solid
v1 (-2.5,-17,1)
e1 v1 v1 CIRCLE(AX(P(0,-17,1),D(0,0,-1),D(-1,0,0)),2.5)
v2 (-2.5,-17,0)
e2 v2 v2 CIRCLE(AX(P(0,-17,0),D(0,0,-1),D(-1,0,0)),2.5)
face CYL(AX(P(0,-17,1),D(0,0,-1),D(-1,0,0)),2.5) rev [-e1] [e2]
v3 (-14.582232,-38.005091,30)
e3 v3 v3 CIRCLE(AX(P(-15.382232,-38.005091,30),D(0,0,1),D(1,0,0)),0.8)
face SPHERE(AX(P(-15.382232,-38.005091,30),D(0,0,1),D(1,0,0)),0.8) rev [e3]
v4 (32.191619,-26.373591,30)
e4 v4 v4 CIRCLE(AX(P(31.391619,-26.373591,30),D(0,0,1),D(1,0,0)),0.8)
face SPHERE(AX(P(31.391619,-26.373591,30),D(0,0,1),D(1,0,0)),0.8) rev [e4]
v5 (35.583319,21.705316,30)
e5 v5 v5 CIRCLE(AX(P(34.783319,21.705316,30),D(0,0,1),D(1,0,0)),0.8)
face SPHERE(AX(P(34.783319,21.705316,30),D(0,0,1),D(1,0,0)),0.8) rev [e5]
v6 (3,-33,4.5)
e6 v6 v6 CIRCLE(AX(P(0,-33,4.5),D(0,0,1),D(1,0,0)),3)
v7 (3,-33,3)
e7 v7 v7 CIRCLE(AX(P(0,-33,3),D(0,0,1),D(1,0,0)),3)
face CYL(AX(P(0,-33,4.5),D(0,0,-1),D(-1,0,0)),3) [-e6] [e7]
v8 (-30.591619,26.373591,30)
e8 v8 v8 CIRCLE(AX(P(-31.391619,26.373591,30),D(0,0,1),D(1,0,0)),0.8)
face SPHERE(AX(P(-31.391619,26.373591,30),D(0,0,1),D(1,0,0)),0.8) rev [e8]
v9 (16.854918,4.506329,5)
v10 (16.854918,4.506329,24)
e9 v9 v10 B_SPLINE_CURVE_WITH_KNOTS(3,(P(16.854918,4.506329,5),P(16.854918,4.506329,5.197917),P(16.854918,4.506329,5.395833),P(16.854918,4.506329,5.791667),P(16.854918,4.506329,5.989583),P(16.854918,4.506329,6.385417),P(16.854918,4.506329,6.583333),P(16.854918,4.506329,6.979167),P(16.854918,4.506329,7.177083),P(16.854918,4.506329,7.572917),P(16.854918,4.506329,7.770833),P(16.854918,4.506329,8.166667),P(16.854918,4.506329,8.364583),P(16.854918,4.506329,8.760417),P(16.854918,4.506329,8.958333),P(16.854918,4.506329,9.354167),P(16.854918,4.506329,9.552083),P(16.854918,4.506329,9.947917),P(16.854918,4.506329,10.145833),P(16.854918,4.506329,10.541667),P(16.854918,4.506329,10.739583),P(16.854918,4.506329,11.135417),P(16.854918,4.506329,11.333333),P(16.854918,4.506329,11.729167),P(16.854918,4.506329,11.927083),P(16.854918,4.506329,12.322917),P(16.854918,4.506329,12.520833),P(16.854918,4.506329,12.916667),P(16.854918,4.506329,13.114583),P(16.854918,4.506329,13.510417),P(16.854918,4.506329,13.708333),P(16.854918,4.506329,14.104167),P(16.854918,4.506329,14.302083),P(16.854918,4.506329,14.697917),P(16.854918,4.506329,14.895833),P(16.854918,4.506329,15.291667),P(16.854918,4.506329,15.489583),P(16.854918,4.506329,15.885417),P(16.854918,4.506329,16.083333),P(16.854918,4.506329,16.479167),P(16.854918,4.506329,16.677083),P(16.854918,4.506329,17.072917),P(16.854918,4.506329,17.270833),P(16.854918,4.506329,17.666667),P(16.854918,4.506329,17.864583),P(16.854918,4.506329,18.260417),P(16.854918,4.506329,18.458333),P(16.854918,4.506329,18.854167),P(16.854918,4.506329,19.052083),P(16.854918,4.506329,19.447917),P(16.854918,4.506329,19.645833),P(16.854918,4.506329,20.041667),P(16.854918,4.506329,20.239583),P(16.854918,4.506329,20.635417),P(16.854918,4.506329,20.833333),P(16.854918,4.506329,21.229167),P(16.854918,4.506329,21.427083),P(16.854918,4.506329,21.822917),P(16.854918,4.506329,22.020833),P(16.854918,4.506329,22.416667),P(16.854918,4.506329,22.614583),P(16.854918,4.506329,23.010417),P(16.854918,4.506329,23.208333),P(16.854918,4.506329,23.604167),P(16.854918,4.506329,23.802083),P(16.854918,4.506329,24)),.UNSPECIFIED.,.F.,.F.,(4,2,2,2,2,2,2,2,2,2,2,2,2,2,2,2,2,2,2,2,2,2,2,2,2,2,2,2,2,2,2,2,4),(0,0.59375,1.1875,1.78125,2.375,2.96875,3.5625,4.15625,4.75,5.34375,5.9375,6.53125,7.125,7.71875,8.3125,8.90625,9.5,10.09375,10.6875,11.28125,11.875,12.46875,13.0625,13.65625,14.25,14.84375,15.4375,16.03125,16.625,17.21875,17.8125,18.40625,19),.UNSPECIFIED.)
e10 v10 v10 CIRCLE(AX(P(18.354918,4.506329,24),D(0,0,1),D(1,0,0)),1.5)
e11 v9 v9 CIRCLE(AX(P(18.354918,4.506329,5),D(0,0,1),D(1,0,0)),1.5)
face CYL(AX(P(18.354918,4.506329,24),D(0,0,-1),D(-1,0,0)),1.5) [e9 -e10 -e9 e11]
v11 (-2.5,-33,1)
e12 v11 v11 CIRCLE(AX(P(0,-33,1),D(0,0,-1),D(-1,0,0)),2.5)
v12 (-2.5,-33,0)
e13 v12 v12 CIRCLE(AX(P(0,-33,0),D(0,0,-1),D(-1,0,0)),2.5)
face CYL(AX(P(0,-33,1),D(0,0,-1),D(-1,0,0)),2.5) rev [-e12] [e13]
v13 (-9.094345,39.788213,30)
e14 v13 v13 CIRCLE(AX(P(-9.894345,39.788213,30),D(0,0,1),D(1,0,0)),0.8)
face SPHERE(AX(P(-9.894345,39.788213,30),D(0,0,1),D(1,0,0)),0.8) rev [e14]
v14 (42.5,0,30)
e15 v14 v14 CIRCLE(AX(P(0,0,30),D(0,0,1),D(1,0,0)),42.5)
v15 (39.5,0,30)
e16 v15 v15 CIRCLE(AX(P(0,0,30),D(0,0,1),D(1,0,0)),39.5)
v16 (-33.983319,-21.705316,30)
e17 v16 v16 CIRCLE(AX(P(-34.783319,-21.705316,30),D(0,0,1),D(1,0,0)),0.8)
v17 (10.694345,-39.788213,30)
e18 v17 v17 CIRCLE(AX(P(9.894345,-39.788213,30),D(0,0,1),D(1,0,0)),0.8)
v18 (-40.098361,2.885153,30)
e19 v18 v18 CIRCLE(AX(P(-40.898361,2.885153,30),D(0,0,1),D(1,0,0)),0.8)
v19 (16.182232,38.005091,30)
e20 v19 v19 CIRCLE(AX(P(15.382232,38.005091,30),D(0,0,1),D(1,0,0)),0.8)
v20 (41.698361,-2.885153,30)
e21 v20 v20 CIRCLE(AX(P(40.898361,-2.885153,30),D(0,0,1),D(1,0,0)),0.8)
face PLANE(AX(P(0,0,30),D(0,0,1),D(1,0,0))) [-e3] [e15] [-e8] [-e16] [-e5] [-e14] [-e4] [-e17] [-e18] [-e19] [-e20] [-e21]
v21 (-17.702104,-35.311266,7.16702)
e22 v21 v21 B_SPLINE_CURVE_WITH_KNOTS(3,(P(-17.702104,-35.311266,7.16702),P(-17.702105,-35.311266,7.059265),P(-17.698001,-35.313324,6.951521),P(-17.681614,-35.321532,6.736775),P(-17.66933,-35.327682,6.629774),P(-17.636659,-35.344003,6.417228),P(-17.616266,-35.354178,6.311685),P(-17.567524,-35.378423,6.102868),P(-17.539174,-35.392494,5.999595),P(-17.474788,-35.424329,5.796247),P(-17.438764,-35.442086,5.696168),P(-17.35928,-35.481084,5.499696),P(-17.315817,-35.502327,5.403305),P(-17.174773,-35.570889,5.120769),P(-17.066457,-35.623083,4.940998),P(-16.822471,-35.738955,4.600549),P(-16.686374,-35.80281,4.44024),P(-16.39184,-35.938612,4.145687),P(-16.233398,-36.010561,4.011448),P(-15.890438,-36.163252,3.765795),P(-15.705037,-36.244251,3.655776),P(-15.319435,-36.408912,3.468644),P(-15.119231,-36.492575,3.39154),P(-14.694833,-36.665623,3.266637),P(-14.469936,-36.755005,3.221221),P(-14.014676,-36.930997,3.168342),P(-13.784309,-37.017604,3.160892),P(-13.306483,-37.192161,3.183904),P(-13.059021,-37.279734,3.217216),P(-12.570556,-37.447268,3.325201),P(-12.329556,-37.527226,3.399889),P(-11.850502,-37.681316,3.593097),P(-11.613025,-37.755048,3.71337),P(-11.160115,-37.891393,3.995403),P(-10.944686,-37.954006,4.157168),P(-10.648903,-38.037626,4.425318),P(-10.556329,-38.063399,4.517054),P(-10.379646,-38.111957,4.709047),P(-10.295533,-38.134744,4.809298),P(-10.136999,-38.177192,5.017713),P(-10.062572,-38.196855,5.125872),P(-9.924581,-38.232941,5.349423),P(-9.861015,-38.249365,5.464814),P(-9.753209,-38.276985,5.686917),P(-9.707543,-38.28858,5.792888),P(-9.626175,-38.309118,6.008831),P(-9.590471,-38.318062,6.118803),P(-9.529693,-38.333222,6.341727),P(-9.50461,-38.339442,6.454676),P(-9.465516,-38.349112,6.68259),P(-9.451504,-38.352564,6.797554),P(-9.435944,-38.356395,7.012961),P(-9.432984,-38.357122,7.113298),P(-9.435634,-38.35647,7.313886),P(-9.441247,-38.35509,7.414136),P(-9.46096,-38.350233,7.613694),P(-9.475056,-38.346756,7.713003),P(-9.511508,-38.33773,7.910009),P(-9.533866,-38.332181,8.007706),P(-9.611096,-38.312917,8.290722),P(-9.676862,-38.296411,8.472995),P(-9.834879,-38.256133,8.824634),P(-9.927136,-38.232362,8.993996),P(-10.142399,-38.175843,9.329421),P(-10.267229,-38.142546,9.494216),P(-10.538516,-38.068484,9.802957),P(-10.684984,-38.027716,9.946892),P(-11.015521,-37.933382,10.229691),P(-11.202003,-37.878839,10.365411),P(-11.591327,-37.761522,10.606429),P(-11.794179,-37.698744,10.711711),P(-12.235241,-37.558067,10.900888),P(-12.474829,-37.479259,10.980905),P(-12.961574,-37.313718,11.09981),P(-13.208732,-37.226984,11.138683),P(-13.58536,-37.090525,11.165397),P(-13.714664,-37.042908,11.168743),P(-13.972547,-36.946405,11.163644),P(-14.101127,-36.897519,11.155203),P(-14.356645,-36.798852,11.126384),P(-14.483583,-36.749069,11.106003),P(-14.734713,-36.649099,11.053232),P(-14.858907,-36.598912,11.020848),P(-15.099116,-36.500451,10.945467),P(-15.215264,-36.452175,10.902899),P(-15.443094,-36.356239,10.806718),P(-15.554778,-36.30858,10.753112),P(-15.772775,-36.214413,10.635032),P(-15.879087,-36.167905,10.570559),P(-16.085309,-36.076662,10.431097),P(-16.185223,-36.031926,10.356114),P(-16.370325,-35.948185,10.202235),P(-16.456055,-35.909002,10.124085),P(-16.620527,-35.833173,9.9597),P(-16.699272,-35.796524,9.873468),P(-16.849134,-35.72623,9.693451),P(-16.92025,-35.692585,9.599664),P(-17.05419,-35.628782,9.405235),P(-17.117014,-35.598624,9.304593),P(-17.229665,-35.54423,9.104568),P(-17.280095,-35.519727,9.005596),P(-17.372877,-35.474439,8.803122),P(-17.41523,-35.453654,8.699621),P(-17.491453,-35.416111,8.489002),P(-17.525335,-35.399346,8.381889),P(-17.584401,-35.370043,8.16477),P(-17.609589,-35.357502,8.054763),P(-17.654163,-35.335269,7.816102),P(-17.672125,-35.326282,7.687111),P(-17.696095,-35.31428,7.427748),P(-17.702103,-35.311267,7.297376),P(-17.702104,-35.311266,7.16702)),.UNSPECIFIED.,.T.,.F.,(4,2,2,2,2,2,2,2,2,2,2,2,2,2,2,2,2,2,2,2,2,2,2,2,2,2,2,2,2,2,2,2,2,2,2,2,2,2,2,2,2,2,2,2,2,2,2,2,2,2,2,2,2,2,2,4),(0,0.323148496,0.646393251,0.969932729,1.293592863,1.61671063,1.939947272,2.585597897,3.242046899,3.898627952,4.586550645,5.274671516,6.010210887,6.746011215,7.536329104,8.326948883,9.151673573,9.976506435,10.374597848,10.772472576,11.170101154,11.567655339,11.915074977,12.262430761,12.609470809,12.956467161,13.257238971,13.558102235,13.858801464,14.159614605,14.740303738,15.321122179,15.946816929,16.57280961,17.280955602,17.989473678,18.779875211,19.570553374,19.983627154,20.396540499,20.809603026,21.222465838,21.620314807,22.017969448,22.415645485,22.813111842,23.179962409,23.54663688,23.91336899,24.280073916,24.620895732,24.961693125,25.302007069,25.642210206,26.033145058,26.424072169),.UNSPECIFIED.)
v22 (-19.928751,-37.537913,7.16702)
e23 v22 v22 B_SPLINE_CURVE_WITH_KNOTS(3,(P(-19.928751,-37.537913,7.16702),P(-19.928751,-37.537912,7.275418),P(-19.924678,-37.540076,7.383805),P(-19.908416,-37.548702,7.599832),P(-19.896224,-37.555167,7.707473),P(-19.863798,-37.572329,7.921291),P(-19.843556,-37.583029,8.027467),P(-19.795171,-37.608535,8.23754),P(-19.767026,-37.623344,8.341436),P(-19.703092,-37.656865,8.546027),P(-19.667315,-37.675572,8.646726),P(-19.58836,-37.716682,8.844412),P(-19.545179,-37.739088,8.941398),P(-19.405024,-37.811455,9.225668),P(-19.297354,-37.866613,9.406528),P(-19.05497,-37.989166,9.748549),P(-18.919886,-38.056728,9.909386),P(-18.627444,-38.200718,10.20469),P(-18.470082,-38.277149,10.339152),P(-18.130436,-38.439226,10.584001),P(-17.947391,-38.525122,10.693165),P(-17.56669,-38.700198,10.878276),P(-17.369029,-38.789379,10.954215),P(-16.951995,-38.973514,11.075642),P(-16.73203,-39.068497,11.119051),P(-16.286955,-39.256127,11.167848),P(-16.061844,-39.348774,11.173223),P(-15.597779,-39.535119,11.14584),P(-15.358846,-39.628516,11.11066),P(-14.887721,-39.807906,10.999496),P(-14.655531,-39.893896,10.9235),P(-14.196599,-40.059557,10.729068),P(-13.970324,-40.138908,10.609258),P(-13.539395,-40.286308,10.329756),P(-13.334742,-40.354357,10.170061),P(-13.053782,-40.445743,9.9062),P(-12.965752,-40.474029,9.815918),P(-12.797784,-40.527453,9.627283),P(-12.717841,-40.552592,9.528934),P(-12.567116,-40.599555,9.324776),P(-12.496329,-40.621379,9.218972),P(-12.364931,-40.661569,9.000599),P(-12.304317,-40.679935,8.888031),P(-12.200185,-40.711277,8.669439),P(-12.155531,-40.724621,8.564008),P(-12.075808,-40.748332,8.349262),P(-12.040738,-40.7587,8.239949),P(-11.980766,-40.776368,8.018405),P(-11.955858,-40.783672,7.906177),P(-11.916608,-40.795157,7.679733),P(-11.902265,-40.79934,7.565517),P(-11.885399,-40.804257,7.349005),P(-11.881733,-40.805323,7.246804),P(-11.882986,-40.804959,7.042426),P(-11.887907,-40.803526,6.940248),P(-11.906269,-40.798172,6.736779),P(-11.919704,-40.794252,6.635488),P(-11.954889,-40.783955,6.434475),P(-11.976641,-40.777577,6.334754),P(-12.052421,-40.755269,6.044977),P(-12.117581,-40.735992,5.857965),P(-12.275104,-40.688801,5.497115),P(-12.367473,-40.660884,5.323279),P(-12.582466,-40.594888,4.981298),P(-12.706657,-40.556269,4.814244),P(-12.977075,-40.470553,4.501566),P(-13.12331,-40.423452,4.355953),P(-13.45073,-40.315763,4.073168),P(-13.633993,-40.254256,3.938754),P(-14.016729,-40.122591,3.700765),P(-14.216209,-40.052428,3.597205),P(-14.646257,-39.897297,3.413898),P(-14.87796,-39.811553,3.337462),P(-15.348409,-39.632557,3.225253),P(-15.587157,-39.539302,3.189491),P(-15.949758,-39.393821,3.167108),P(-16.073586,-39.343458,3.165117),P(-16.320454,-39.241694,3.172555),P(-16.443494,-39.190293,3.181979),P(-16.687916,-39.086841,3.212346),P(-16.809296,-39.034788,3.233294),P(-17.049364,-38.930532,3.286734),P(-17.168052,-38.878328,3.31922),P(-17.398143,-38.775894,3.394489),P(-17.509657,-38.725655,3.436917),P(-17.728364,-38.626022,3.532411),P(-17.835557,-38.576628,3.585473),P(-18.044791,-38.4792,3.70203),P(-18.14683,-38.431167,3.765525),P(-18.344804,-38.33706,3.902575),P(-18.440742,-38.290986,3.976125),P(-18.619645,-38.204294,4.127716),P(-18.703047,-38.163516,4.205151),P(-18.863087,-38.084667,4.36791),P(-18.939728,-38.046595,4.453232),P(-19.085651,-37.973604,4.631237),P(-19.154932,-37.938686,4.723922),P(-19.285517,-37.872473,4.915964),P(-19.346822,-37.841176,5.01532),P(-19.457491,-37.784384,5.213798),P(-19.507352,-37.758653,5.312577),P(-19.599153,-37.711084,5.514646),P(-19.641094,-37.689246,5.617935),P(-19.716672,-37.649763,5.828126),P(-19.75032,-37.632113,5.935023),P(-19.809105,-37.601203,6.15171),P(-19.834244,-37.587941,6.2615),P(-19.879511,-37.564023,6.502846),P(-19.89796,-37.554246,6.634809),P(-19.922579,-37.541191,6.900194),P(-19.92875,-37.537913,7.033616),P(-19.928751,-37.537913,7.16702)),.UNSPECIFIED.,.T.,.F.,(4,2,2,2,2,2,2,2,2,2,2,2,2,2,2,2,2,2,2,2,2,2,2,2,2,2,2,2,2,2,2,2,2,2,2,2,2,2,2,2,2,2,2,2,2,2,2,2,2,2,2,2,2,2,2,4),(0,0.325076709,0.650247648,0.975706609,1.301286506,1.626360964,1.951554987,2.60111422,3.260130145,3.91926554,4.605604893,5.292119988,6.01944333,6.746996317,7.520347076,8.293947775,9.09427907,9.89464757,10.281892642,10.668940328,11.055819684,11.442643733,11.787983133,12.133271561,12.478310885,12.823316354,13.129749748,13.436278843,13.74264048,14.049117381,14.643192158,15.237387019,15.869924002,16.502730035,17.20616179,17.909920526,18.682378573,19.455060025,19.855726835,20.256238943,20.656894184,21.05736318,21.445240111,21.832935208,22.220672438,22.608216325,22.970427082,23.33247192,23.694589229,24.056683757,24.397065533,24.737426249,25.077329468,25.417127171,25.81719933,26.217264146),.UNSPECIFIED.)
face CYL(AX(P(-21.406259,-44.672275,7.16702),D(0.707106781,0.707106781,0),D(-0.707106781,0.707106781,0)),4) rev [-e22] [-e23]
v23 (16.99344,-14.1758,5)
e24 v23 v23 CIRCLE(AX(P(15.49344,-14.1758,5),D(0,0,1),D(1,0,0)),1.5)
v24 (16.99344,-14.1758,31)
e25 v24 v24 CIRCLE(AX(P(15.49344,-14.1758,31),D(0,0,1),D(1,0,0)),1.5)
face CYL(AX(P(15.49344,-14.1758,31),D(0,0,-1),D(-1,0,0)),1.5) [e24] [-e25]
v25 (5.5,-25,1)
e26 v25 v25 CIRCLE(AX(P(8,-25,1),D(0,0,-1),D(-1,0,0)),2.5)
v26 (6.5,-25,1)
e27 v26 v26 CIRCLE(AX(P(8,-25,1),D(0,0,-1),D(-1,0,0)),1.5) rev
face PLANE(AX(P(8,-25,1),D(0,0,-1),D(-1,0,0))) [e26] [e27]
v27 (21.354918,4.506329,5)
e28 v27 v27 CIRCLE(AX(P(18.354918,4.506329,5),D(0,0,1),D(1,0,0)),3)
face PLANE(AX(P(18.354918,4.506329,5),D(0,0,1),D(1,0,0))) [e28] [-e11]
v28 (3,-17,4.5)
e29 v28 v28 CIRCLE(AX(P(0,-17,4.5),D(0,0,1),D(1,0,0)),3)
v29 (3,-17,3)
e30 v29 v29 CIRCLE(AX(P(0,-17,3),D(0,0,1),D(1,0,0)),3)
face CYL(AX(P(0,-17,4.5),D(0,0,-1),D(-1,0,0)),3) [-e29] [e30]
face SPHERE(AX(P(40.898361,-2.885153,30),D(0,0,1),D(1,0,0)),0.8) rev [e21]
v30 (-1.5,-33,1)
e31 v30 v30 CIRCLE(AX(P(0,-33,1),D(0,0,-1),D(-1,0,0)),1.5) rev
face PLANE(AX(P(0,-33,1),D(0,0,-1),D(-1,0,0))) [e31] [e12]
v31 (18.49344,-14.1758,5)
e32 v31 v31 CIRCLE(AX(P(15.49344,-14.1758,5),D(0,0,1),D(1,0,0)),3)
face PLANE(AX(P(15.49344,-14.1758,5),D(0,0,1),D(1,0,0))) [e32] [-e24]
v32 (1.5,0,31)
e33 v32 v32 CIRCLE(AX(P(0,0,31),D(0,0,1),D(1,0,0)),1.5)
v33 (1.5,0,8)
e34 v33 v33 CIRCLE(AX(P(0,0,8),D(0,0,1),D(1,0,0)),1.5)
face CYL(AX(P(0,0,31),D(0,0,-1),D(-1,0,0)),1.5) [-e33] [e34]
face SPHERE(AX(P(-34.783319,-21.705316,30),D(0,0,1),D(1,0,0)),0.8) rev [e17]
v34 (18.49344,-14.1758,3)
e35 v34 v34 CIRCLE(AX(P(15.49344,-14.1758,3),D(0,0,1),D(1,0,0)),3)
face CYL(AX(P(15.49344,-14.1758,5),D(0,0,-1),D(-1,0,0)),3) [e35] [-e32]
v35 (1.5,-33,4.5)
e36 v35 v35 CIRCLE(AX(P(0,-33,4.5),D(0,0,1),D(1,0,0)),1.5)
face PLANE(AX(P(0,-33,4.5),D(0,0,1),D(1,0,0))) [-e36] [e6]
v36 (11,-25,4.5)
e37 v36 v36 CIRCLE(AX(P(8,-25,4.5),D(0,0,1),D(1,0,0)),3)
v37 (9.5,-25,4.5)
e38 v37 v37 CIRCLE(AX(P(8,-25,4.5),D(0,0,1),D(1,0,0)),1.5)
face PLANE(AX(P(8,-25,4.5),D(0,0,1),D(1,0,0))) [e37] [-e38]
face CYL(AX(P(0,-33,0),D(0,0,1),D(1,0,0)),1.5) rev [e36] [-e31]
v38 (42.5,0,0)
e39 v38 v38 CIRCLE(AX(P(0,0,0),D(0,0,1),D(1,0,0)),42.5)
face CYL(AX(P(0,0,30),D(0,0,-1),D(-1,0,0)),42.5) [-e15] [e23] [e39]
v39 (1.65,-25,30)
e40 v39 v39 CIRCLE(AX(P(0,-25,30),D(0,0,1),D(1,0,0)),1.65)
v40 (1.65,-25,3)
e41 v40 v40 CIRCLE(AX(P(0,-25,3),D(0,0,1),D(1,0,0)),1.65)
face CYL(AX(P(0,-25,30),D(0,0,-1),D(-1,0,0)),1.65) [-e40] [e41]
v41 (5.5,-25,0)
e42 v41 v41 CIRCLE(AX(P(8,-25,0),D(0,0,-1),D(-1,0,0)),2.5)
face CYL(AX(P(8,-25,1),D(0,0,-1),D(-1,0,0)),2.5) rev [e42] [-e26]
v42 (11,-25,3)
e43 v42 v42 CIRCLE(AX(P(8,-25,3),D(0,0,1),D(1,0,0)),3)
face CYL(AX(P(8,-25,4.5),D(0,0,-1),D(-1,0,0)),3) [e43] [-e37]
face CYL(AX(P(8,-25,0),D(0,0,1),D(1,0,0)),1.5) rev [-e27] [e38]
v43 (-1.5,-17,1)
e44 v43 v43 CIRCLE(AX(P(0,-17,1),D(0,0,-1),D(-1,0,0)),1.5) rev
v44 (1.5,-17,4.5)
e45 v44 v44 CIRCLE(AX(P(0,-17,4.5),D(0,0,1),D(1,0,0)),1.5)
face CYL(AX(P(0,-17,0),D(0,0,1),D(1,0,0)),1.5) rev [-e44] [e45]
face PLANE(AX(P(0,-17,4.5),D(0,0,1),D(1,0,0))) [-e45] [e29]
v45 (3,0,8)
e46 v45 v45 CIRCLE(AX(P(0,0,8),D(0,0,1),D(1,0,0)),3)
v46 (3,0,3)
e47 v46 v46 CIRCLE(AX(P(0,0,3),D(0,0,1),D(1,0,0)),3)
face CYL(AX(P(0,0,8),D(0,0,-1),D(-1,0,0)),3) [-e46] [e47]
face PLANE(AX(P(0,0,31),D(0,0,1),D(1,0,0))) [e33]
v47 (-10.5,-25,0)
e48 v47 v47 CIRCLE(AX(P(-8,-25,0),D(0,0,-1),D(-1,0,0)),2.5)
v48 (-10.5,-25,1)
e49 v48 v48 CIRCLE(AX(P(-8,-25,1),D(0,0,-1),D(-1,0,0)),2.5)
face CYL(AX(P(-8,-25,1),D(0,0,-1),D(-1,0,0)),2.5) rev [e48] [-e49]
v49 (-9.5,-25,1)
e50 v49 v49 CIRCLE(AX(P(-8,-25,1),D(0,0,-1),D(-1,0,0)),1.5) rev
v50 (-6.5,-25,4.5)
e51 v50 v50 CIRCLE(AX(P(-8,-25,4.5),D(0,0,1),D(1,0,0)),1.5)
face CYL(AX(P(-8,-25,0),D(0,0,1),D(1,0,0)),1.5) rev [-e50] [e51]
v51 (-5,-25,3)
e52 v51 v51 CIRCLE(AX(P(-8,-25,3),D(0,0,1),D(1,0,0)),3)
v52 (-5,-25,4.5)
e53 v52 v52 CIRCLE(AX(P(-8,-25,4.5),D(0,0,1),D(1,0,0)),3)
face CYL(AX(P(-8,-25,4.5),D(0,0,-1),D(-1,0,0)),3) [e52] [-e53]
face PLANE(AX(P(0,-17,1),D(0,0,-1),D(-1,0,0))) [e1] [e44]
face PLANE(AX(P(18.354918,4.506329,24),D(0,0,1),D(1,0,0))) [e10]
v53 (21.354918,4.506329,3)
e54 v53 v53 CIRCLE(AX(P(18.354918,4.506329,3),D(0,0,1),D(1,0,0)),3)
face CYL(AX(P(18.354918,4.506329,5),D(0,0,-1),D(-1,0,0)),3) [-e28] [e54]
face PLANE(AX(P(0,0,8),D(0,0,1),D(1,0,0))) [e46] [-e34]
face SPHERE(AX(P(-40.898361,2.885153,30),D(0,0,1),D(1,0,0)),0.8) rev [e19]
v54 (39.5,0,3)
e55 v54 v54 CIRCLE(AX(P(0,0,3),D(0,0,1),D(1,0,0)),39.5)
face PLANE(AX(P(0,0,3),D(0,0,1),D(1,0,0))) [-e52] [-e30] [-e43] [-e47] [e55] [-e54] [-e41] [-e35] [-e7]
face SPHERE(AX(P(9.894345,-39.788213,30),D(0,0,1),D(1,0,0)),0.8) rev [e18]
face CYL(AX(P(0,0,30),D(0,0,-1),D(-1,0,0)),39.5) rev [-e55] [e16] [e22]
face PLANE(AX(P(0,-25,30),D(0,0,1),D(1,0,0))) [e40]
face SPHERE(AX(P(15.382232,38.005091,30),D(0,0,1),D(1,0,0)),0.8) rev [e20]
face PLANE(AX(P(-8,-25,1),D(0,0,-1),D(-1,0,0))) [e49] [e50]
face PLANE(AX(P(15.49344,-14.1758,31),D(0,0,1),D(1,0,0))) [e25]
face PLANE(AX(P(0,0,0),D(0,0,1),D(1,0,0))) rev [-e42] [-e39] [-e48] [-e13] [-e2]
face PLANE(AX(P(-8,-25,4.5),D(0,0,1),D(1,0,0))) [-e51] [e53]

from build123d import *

# Parameters (mm, degrees)
SKETCH_1_R               = 42.5
SKETCH_1_R_2             = 39.5
EXTRUDE_1_DEPTH          = 30
EXTRUDE_3_OUTLINE_R      = 39.5
EXTRUDE_3_DEPTH          = 3
SKETCH_5_R               = 1.65
EXTRUDE_4_DEPTH          = 27
SKETCH_10_R              = 3
EXTRUDE_10_DEPTH         = 1.5
SKETCH_21_R              = 1.5
CUT_EXTRUDE_1_DEPTH      = 66.289738857
SKETCH_6_R               = 1.5
EXTRUDE_5_DEPTH          = 28
SKETCH_7_R               = 3
EXTRUDE_6_DEPTH          = 2
SKETCH_8_R               = 1.5
EXTRUDE_7_DEPTH          = 21
SKETCH_9_R               = 3
EXTRUDE_8_DEPTH          = 2
SKETCH_22_R              = 2.5
CUT_EXTRUDE_2_DEPTH      = 1
SKETCH_23_R              = 1.5
EXTRUDE_11_DEPTH         = 28
SKETCH_25_R              = 3
EXTRUDE_12_DEPTH         = 5
CUT_EXTRUDE_START        = -40.635067554
CUT_EXTRUDE_3_OUTLINE_R  = 4
CUT_EXTRUDE_3_DEPTH      = 6.841816997
PATTERN_CIRCULAR_1_COUNT = 10


# Read off the part's stored shape, not the designer's step: 凸台-拉伸3, 切除-拉伸3
with BuildPart() as part:
    # 草图1 → 凸台-拉伸1 (new body)
    with BuildSketch(Plane.XY):
        Circle(SKETCH_1_R)
        Circle(SKETCH_1_R_2, mode=Mode.SUBTRACT)
    extrude(amount=EXTRUDE_1_DEPTH)

    # 凸台-拉伸3 outline → 凸台-拉伸3 (add)
    with BuildSketch(Plane.XY):
        Circle(EXTRUDE_3_OUTLINE_R)
    extrude(amount=EXTRUDE_3_DEPTH)

    # 草图5 → 凸台-拉伸4 (add)
    with BuildSketch(Plane.XY.offset(3)):
        with Locations((0, -25)):
            Circle(SKETCH_5_R)
    extrude(amount=EXTRUDE_4_DEPTH)

    # 草图10 → 凸台-拉伸10 (add)
    with BuildSketch(Plane.XY.offset(3)):
        with Locations((8, -25)):
            Circle(SKETCH_10_R)
        with Locations((0, -17)):
            Circle(SKETCH_10_R)
        with Locations((-8, -25)):
            Circle(SKETCH_10_R)
        with Locations((0, -33)):
            Circle(SKETCH_10_R)
    extrude(amount=EXTRUDE_10_DEPTH)

    # 草图21 → 切除-拉伸1 (cut, through all)
    with BuildSketch(Plane.XY.offset(4.5)):
        with Locations((-8, -25)):
            Circle(SKETCH_21_R)
        with Locations((0, -17)):
            Circle(SKETCH_21_R)
        with Locations((8, -25)):
            Circle(SKETCH_21_R)
        with Locations((0, -33)):
            Circle(SKETCH_21_R)
    extrude(amount=-CUT_EXTRUDE_1_DEPTH, mode=Mode.SUBTRACT)

    # 草图6 → 凸台-拉伸5 (add)
    with BuildSketch(Plane.XY.offset(3)):
        with Locations((15.493440366, -14.1758)):
            Circle(SKETCH_6_R)
    extrude(amount=EXTRUDE_5_DEPTH)

    # 草图7 → 凸台-拉伸6 (add)
    with BuildSketch(Plane.XY.offset(3)):
        with Locations((15.493440366, -14.1758)):
            Circle(SKETCH_7_R)
    extrude(amount=EXTRUDE_6_DEPTH)

    # 草图8 → 凸台-拉伸7 (add)
    with BuildSketch(Plane.XY.offset(3)):
        with Locations(Location((18.354917539, 4.506329118, 0), (0, 0, 180))):
            Circle(SKETCH_8_R)
    extrude(amount=EXTRUDE_7_DEPTH)

    # 草图9 → 凸台-拉伸8 (add)
    with BuildSketch(Plane.XY.offset(3)):
        with Locations((18.354917539, 4.506329118)):
            Circle(SKETCH_9_R)
    extrude(amount=EXTRUDE_8_DEPTH)

    # 草图22 → 切除-拉伸2 (cut)
    with BuildSketch(Plane(origin=(0, 0, 0), x_dir=(-1, 0, 0), z_dir=(0, 0, -1))):
        with Locations((-8, -25)):
            Circle(SKETCH_22_R)
        with Locations((0, -17)):
            Circle(SKETCH_22_R)
        with Locations((8, -25)):
            Circle(SKETCH_22_R)
        with Locations((0, -33)):
            Circle(SKETCH_22_R)
    extrude(amount=-CUT_EXTRUDE_2_DEPTH, mode=Mode.SUBTRACT)

    # 草图23 → 凸台-拉伸11 (add)
    with BuildSketch(Plane.XY.offset(3)):
        Circle(SKETCH_23_R)
    extrude(amount=EXTRUDE_11_DEPTH)

    # 草图25 → 凸台-拉伸12 (add)
    with BuildSketch(Plane.XY.offset(3)):
        Circle(SKETCH_25_R)
    extrude(amount=EXTRUDE_12_DEPTH)

    # 切除-拉伸3 outline → 切除-拉伸3 (cut)
    with BuildSketch(Plane(origin=(0, 0, 0), x_dir=(0.707106781186546, -0.707106781186549, 0), z_dir=(0.707106781186549, 0.707106781186546, 0)).offset(CUT_EXTRUDE_START)):
        with Locations((16.451557856, -7.167019764)):
            Circle(CUT_EXTRUDE_3_OUTLINE_R)
    extrude(amount=CUT_EXTRUDE_3_DEPTH, mode=Mode.SUBTRACT)

    # 草图27 → 切除-旋转9 (revolve, cut)
    with BuildSketch(Plane.XY.offset(30)):
        with BuildLine():
            Line((-15.682372669, -38.746653887), (-15.082090462, -37.26352838))
            ThreePointArc((-15.082090462, -37.26352838), (-14.640668812, -38.305232237), (-15.682372669, -38.746653887))
        make_face()
    cut_revolve_9 = revolve(axis=Axis((-15.682372669, -38.746653887, 30), (0.3751763796445371, 0.9269534422811203, 0)), mode=Mode.SUBTRACT)

    # 阵列(圆周)1: 切除-旋转9 ×10 about axis
    pattern_circular_1_axis = Axis((0, 0, 0), (0, 0, 1))
    for i in range(1, PATTERN_CIRCULAR_1_COUNT):
        add(cut_revolve_9.rotate(pattern_circular_1_axis, i * 360 / PATTERN_CIRCULAR_1_COUNT), mode=Mode.SUBTRACT)


solid = part.part
